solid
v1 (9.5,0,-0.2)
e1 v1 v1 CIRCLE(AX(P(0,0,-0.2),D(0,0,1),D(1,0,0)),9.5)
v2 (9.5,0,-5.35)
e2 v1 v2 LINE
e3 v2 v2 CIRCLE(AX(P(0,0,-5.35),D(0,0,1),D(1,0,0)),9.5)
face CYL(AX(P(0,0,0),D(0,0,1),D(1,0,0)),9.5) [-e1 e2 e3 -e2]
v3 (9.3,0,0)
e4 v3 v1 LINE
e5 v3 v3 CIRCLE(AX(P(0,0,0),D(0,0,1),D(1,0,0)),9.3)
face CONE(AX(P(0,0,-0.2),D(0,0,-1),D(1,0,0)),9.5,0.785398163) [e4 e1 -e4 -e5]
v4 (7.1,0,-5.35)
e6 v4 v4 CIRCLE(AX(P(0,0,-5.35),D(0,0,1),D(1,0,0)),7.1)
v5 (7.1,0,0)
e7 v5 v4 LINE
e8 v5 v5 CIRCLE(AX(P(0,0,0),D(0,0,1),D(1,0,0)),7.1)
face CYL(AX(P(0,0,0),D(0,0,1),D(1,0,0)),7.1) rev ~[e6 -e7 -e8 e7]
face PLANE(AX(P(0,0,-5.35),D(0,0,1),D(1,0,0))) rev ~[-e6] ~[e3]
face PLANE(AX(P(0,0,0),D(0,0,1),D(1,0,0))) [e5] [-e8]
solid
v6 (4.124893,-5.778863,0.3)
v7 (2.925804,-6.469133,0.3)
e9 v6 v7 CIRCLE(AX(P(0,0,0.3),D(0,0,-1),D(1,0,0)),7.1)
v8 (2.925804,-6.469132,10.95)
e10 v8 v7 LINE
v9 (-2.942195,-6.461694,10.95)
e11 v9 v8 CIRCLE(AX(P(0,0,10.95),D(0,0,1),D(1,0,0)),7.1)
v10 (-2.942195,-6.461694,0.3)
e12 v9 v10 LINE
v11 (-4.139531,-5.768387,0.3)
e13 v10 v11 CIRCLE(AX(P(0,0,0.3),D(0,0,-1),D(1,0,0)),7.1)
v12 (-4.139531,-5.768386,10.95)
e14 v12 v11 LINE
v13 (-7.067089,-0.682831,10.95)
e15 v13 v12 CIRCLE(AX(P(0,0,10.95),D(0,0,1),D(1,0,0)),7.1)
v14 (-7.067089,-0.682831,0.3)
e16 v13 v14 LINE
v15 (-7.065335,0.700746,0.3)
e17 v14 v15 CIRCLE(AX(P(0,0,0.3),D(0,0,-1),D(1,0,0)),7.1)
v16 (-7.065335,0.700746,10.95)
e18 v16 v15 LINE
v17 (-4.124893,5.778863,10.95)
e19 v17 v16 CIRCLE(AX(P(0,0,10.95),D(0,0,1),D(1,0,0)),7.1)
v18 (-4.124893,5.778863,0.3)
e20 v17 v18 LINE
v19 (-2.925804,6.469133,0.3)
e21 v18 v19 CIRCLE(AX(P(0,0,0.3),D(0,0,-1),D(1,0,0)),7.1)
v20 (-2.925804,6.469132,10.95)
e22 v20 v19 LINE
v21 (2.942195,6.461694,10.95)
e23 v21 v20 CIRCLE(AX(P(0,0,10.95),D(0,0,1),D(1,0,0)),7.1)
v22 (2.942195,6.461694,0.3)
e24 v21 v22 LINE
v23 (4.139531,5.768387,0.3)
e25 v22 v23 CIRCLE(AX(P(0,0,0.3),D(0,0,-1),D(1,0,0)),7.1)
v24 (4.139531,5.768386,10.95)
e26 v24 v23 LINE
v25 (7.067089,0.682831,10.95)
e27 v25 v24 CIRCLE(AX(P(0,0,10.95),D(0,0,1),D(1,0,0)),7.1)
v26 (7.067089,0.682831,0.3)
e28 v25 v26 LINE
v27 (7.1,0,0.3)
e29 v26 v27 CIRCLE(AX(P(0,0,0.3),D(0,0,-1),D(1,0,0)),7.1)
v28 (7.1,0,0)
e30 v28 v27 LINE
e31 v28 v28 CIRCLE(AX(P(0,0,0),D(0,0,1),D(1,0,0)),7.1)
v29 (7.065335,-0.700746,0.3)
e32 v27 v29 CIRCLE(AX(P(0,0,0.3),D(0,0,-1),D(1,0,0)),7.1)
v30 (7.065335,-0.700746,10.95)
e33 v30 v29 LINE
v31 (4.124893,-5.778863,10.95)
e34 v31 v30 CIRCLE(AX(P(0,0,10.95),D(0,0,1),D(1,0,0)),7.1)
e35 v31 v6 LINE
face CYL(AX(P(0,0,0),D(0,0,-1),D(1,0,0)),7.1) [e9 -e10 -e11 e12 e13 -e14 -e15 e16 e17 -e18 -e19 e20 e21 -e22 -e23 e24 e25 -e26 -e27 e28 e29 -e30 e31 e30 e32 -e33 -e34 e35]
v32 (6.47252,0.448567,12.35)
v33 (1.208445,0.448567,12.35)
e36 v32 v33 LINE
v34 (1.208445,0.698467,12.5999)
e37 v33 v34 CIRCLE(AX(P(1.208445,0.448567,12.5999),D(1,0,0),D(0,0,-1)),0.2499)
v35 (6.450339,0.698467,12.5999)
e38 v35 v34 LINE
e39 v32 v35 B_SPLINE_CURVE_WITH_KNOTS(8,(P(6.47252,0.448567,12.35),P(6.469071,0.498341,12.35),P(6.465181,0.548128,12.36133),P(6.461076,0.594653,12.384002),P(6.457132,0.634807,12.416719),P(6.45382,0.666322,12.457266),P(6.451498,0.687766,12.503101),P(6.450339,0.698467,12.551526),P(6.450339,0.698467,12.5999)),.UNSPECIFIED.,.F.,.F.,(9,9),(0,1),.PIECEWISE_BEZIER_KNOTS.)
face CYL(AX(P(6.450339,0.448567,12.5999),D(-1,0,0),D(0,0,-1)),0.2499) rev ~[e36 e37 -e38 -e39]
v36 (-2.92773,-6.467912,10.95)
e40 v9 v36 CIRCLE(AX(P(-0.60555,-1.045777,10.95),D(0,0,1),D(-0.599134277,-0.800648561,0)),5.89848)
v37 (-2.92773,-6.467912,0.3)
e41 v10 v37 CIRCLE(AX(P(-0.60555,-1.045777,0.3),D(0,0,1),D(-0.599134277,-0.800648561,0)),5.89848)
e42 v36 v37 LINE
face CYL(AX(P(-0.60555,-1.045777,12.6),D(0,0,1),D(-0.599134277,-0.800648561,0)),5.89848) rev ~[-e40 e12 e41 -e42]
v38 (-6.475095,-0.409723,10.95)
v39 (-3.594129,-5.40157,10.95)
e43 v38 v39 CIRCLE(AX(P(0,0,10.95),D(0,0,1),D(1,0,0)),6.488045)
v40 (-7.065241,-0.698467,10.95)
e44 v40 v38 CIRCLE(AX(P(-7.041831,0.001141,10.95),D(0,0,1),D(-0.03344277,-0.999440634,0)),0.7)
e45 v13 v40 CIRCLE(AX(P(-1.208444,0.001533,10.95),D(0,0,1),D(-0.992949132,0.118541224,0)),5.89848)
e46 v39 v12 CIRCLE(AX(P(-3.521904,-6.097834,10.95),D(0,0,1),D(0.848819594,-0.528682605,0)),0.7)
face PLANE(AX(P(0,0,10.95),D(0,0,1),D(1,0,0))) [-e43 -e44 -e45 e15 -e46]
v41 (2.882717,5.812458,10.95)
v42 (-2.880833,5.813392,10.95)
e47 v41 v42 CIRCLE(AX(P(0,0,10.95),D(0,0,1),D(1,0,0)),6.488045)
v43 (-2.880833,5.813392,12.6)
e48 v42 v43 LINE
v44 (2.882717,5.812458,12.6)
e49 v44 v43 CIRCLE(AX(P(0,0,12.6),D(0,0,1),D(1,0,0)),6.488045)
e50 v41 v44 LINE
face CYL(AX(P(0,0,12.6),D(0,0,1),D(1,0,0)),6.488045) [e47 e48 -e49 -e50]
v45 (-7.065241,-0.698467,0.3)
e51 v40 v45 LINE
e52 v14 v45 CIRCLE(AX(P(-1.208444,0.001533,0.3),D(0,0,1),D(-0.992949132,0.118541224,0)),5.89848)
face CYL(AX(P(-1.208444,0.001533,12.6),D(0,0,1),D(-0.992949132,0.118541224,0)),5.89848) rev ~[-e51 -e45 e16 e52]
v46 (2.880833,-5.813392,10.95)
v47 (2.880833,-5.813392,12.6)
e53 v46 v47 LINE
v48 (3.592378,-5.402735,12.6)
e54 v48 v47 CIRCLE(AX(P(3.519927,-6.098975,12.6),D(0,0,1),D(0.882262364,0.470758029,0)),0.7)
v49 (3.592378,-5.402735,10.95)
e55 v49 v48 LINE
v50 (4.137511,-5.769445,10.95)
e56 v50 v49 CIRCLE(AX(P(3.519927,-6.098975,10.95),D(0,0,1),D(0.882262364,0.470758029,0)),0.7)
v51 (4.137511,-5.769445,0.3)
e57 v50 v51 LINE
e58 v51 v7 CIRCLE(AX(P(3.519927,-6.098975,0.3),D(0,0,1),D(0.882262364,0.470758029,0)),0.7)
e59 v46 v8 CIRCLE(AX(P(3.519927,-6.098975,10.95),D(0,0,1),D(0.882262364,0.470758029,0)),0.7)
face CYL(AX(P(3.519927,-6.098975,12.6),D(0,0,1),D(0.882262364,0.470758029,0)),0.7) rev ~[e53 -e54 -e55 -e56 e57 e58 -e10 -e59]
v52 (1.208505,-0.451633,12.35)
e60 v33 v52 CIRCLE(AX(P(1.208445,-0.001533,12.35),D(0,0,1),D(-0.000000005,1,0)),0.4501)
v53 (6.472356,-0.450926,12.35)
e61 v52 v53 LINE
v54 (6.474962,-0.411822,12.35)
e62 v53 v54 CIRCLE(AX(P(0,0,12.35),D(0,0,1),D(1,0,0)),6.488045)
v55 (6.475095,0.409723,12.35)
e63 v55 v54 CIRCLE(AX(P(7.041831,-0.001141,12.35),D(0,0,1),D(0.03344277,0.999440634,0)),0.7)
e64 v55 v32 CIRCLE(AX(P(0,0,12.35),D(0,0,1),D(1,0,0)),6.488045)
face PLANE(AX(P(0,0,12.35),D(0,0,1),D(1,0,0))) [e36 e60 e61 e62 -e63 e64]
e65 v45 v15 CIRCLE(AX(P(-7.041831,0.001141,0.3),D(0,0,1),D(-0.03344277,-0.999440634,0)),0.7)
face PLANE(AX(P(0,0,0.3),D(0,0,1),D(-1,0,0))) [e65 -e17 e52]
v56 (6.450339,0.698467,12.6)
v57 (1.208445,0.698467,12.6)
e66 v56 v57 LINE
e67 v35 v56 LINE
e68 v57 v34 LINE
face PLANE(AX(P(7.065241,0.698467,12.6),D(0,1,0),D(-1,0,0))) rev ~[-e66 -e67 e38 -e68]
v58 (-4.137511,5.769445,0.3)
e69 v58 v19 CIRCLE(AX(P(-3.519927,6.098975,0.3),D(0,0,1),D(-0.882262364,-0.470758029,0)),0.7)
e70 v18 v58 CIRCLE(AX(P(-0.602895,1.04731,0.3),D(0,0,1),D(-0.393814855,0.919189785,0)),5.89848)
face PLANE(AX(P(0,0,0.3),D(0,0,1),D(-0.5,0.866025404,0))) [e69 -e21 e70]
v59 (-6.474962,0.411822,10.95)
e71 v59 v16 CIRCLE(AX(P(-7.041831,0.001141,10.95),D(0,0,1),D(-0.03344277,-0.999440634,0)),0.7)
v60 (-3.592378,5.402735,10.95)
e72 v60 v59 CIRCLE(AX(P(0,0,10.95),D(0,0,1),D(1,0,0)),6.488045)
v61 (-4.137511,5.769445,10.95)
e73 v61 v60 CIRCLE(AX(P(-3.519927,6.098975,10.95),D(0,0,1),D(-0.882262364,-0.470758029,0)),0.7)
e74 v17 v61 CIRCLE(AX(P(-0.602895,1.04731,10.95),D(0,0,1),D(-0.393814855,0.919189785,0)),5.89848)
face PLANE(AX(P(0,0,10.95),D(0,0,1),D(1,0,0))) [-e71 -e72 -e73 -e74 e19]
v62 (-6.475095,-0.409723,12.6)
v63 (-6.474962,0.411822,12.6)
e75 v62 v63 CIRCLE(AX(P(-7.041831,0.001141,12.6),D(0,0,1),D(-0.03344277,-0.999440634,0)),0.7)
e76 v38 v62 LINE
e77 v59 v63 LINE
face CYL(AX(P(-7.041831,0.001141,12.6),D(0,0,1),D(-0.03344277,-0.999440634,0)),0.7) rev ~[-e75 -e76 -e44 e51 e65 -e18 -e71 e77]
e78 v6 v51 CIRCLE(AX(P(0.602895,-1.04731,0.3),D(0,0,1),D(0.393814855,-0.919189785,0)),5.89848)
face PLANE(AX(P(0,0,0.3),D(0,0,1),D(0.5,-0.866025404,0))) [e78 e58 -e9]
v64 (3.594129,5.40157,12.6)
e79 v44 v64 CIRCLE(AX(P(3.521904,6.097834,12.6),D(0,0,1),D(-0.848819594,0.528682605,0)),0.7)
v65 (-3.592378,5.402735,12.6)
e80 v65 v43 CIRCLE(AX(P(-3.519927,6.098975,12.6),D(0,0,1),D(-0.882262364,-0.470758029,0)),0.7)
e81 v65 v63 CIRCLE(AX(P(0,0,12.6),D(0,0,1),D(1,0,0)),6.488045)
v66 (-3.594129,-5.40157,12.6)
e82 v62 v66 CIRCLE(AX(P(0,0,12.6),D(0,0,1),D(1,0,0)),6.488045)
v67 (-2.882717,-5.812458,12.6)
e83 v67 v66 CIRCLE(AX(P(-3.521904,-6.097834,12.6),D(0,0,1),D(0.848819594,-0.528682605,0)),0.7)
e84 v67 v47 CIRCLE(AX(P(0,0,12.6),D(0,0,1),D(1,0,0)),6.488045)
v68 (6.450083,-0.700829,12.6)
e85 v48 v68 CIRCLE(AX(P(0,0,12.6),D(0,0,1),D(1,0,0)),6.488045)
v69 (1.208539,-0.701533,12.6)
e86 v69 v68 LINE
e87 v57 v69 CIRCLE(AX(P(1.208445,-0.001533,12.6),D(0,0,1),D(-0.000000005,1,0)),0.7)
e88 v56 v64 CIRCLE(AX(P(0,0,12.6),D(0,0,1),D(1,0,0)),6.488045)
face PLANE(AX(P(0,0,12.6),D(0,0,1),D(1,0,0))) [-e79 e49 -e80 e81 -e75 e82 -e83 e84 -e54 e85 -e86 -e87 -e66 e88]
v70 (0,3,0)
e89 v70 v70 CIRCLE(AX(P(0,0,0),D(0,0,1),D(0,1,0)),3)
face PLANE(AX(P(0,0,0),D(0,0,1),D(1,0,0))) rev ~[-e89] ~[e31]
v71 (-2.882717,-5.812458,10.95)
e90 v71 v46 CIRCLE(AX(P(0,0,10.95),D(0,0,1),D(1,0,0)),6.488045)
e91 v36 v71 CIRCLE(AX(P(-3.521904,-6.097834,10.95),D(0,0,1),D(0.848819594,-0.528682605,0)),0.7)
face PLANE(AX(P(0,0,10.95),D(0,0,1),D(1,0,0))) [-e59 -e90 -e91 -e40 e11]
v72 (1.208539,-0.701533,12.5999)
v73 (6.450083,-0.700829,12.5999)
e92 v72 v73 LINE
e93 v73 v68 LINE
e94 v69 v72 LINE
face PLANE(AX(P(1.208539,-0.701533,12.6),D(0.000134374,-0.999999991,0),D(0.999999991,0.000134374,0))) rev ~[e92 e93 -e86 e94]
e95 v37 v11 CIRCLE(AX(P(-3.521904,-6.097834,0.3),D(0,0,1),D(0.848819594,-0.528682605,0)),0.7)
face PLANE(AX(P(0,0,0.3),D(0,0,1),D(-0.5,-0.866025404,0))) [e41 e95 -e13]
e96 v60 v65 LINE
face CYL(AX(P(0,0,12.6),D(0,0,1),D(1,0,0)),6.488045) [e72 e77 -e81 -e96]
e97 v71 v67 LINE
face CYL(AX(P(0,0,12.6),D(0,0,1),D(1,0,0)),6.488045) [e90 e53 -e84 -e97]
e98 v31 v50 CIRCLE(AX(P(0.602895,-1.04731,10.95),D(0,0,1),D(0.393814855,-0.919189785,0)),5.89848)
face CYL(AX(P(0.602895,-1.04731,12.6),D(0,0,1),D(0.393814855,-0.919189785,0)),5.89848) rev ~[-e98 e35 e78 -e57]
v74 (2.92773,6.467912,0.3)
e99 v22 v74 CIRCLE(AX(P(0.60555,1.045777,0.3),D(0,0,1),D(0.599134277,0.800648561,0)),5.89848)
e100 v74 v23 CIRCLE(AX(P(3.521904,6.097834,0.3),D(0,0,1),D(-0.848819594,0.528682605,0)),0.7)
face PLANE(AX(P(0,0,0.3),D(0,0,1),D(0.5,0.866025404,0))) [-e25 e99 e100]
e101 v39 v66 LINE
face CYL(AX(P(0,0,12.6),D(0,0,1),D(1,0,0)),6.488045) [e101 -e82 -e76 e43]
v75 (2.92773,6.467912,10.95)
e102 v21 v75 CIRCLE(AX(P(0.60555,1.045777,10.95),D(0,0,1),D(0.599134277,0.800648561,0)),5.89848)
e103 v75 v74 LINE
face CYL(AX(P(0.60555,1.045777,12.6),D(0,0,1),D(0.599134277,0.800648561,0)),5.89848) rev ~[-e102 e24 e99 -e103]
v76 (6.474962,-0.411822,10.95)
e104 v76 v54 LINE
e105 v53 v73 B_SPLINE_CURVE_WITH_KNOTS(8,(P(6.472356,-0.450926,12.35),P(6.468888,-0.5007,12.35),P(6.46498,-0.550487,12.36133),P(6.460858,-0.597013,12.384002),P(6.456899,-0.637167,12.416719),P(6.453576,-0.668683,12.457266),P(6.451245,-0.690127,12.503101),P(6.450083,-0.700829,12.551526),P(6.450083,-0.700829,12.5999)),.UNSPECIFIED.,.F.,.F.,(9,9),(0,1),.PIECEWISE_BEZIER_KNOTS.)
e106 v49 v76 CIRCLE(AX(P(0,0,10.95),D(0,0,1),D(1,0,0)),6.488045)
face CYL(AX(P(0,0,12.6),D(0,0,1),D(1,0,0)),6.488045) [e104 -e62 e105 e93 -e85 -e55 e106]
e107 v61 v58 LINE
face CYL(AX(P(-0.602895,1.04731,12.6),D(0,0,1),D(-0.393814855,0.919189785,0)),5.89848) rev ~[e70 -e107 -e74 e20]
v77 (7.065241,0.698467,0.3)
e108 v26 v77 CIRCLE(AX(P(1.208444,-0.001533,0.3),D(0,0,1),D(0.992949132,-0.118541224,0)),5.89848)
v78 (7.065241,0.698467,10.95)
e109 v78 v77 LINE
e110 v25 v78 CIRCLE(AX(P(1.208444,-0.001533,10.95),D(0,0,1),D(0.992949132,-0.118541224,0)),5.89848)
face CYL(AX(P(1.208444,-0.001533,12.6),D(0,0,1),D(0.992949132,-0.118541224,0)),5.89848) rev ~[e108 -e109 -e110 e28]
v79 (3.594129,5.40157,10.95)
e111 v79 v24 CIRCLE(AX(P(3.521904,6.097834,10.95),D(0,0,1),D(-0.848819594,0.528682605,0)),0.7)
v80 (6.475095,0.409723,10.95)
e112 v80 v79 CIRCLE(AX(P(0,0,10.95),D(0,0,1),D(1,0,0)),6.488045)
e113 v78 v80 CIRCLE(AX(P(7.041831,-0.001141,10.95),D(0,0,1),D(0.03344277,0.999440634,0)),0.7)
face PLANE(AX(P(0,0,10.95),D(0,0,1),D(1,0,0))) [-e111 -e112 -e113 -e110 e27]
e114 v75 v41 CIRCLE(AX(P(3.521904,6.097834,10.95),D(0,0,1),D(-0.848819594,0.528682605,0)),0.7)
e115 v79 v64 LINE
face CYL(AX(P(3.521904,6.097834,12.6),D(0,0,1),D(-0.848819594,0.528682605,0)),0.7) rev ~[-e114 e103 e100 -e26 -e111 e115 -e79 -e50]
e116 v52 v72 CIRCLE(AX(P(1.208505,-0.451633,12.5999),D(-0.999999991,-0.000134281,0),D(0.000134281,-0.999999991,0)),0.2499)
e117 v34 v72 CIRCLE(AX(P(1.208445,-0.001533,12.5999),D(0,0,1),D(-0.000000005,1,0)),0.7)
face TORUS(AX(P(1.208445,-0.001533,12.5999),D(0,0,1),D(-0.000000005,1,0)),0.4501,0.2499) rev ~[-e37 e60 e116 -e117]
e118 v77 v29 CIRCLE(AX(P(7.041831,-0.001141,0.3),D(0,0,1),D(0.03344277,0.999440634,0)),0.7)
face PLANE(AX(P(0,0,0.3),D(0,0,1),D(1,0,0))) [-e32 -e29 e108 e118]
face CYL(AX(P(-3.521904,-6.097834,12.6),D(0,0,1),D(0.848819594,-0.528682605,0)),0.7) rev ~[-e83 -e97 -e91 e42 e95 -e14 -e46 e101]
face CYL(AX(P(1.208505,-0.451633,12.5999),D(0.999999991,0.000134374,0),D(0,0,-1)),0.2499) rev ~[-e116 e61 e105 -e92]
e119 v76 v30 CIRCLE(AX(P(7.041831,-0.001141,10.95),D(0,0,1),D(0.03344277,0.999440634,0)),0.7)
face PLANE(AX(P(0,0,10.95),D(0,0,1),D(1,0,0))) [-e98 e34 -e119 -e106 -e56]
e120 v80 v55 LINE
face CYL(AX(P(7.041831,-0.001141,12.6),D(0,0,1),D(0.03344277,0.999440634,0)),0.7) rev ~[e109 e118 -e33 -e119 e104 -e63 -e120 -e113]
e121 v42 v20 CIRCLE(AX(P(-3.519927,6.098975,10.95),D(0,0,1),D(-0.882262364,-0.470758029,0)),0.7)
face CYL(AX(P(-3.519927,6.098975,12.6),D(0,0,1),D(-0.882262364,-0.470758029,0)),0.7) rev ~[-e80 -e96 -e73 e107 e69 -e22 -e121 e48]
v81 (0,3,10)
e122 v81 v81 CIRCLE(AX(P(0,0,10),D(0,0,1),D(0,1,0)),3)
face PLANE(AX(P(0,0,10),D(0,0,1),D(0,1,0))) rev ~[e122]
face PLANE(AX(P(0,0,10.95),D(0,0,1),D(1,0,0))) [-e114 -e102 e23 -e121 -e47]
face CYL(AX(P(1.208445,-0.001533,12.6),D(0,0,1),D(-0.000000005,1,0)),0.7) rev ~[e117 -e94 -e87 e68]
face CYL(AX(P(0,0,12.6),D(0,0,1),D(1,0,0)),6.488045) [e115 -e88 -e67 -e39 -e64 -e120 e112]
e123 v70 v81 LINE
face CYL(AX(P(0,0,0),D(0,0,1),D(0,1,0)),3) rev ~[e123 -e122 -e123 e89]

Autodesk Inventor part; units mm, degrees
ref_plane "YZ Plane" through (0, 0, 0) normal (1, 0, 0) x (0, 1, 0)
ref_plane "XZ Plane" through (0, 0, 0) normal (0, 1, 0) x (-1, 0, 0)
ref_plane "XY Plane" through (0, 0, 0) normal (0, 0, 1) x (1, 0, 0)
sketch "Sketch1" plane through (0, 0, 0) normal (0, 0, 1) x (1, 0, 0)
  circle A0 centre (0, 0) radius 9.5
  circle A1 centre (0, 0) radius 7.1
  dimension "d0" = 19
  dimension "d1" = 14.2
extrude "Extrusion1" add sketch "Sketch1" along normal blind 12.6 contours A1
extrude "Extrusion2" add sketch "Sketch1" against normal blind 5.35
hole "Hole1" at (0, 0, 0) direction (0, 0, 1) diameter 6 depth 10
sketch "Sketch2" plane through (0, 0, 12.6) normal (0, 0, 1) x (1, 0, 0)
  arc A0 (7.065241, 0.698467) -> (7.065335, -0.700746) centre (7.041831, -0.001141) ccw
  arc A1 (7.065335, -0.700746) -> (7.065241, 0.698467) centre (1.208445, -0.001533) ccw
  arc A2 (1.208445, 0.698467) -> (1.208539, -0.701533) centre (1.208445, -0.001533) ccw
  line L0 (1.208445, 0.698467) -> (7.065241, 0.698467)
  circle A3 centre (0, 0) radius 7.1
  line L1 (7.065335, -0.700746) -> (1.208539, -0.701533)
  dimension "d25" = 0.7
  dimension "d26" = 0.7
sketch "Sketch2 outline for Extrusion3" plane through (0, 0, 12.6) normal (0, 0, 1) x (1, 0, 0)
  arc A0 (7.065241, 0.698467) -> (7.065335, -0.700746) centre (7.041831, -0.001141) ccw
  arc A1 (7.065335, -0.700746) -> (7.065241, 0.698467) centre (1.208445, -0.001533) ccw
extrude "Extrusion3" cut sketch "Sketch2 outline for Extrusion3" against normal blind 12.3
pattern_circular "Circular Pattern1" count 6 over 360 about axis through (0, 0, 0) along (0, 0, 1) of "Extrusion3"
sketch "Sketch3" plane through (0, 0, 12.6) normal (0, 0, 1) x (1, 0, 0)
  circle A0 centre (0, 0) radius 6.488045
  circle A1 centre (0, 0) radius 7.1
extrude "Extrusion4" cut sketch "Sketch3" against normal blind 1.65
sketch "Sketch2 outline for Extrusion5" plane through (0, 0, 12.6) normal (0, 0, 1) x (1, 0, 0)
  line L0 (7.065241, 0.698467) -> (1.208445, 0.698467)
  arc A0 (7.065335, -0.700746) -> (7.065241, 0.698467) centre (1.208445, -0.001533) ccw
  line L1 (1.208539, -0.701533) -> (7.065335, -0.700746)
  arc A1 (1.208445, 0.698467) -> (1.208539, -0.701533) centre (1.208445, -0.001533) ccw
extrude "Extrusion5" cut sketch "Sketch2 outline for Extrusion5" against normal blind 0.25
fillet "Fillet1" radius 0.25 3 edges at (0.5084, -0.0016, 12.35) (3.8293, -0.7012, 12.35) (3.8294, 0.6985, 12.35)
chamfer "Chamfer1" distance 0.2 angle 45 1 edges at (-9.5, 0, 0)
equation "\"d26\" = d25"
properties part number "Perilla para Potenciometro" material "PC/ABS Plastic"
